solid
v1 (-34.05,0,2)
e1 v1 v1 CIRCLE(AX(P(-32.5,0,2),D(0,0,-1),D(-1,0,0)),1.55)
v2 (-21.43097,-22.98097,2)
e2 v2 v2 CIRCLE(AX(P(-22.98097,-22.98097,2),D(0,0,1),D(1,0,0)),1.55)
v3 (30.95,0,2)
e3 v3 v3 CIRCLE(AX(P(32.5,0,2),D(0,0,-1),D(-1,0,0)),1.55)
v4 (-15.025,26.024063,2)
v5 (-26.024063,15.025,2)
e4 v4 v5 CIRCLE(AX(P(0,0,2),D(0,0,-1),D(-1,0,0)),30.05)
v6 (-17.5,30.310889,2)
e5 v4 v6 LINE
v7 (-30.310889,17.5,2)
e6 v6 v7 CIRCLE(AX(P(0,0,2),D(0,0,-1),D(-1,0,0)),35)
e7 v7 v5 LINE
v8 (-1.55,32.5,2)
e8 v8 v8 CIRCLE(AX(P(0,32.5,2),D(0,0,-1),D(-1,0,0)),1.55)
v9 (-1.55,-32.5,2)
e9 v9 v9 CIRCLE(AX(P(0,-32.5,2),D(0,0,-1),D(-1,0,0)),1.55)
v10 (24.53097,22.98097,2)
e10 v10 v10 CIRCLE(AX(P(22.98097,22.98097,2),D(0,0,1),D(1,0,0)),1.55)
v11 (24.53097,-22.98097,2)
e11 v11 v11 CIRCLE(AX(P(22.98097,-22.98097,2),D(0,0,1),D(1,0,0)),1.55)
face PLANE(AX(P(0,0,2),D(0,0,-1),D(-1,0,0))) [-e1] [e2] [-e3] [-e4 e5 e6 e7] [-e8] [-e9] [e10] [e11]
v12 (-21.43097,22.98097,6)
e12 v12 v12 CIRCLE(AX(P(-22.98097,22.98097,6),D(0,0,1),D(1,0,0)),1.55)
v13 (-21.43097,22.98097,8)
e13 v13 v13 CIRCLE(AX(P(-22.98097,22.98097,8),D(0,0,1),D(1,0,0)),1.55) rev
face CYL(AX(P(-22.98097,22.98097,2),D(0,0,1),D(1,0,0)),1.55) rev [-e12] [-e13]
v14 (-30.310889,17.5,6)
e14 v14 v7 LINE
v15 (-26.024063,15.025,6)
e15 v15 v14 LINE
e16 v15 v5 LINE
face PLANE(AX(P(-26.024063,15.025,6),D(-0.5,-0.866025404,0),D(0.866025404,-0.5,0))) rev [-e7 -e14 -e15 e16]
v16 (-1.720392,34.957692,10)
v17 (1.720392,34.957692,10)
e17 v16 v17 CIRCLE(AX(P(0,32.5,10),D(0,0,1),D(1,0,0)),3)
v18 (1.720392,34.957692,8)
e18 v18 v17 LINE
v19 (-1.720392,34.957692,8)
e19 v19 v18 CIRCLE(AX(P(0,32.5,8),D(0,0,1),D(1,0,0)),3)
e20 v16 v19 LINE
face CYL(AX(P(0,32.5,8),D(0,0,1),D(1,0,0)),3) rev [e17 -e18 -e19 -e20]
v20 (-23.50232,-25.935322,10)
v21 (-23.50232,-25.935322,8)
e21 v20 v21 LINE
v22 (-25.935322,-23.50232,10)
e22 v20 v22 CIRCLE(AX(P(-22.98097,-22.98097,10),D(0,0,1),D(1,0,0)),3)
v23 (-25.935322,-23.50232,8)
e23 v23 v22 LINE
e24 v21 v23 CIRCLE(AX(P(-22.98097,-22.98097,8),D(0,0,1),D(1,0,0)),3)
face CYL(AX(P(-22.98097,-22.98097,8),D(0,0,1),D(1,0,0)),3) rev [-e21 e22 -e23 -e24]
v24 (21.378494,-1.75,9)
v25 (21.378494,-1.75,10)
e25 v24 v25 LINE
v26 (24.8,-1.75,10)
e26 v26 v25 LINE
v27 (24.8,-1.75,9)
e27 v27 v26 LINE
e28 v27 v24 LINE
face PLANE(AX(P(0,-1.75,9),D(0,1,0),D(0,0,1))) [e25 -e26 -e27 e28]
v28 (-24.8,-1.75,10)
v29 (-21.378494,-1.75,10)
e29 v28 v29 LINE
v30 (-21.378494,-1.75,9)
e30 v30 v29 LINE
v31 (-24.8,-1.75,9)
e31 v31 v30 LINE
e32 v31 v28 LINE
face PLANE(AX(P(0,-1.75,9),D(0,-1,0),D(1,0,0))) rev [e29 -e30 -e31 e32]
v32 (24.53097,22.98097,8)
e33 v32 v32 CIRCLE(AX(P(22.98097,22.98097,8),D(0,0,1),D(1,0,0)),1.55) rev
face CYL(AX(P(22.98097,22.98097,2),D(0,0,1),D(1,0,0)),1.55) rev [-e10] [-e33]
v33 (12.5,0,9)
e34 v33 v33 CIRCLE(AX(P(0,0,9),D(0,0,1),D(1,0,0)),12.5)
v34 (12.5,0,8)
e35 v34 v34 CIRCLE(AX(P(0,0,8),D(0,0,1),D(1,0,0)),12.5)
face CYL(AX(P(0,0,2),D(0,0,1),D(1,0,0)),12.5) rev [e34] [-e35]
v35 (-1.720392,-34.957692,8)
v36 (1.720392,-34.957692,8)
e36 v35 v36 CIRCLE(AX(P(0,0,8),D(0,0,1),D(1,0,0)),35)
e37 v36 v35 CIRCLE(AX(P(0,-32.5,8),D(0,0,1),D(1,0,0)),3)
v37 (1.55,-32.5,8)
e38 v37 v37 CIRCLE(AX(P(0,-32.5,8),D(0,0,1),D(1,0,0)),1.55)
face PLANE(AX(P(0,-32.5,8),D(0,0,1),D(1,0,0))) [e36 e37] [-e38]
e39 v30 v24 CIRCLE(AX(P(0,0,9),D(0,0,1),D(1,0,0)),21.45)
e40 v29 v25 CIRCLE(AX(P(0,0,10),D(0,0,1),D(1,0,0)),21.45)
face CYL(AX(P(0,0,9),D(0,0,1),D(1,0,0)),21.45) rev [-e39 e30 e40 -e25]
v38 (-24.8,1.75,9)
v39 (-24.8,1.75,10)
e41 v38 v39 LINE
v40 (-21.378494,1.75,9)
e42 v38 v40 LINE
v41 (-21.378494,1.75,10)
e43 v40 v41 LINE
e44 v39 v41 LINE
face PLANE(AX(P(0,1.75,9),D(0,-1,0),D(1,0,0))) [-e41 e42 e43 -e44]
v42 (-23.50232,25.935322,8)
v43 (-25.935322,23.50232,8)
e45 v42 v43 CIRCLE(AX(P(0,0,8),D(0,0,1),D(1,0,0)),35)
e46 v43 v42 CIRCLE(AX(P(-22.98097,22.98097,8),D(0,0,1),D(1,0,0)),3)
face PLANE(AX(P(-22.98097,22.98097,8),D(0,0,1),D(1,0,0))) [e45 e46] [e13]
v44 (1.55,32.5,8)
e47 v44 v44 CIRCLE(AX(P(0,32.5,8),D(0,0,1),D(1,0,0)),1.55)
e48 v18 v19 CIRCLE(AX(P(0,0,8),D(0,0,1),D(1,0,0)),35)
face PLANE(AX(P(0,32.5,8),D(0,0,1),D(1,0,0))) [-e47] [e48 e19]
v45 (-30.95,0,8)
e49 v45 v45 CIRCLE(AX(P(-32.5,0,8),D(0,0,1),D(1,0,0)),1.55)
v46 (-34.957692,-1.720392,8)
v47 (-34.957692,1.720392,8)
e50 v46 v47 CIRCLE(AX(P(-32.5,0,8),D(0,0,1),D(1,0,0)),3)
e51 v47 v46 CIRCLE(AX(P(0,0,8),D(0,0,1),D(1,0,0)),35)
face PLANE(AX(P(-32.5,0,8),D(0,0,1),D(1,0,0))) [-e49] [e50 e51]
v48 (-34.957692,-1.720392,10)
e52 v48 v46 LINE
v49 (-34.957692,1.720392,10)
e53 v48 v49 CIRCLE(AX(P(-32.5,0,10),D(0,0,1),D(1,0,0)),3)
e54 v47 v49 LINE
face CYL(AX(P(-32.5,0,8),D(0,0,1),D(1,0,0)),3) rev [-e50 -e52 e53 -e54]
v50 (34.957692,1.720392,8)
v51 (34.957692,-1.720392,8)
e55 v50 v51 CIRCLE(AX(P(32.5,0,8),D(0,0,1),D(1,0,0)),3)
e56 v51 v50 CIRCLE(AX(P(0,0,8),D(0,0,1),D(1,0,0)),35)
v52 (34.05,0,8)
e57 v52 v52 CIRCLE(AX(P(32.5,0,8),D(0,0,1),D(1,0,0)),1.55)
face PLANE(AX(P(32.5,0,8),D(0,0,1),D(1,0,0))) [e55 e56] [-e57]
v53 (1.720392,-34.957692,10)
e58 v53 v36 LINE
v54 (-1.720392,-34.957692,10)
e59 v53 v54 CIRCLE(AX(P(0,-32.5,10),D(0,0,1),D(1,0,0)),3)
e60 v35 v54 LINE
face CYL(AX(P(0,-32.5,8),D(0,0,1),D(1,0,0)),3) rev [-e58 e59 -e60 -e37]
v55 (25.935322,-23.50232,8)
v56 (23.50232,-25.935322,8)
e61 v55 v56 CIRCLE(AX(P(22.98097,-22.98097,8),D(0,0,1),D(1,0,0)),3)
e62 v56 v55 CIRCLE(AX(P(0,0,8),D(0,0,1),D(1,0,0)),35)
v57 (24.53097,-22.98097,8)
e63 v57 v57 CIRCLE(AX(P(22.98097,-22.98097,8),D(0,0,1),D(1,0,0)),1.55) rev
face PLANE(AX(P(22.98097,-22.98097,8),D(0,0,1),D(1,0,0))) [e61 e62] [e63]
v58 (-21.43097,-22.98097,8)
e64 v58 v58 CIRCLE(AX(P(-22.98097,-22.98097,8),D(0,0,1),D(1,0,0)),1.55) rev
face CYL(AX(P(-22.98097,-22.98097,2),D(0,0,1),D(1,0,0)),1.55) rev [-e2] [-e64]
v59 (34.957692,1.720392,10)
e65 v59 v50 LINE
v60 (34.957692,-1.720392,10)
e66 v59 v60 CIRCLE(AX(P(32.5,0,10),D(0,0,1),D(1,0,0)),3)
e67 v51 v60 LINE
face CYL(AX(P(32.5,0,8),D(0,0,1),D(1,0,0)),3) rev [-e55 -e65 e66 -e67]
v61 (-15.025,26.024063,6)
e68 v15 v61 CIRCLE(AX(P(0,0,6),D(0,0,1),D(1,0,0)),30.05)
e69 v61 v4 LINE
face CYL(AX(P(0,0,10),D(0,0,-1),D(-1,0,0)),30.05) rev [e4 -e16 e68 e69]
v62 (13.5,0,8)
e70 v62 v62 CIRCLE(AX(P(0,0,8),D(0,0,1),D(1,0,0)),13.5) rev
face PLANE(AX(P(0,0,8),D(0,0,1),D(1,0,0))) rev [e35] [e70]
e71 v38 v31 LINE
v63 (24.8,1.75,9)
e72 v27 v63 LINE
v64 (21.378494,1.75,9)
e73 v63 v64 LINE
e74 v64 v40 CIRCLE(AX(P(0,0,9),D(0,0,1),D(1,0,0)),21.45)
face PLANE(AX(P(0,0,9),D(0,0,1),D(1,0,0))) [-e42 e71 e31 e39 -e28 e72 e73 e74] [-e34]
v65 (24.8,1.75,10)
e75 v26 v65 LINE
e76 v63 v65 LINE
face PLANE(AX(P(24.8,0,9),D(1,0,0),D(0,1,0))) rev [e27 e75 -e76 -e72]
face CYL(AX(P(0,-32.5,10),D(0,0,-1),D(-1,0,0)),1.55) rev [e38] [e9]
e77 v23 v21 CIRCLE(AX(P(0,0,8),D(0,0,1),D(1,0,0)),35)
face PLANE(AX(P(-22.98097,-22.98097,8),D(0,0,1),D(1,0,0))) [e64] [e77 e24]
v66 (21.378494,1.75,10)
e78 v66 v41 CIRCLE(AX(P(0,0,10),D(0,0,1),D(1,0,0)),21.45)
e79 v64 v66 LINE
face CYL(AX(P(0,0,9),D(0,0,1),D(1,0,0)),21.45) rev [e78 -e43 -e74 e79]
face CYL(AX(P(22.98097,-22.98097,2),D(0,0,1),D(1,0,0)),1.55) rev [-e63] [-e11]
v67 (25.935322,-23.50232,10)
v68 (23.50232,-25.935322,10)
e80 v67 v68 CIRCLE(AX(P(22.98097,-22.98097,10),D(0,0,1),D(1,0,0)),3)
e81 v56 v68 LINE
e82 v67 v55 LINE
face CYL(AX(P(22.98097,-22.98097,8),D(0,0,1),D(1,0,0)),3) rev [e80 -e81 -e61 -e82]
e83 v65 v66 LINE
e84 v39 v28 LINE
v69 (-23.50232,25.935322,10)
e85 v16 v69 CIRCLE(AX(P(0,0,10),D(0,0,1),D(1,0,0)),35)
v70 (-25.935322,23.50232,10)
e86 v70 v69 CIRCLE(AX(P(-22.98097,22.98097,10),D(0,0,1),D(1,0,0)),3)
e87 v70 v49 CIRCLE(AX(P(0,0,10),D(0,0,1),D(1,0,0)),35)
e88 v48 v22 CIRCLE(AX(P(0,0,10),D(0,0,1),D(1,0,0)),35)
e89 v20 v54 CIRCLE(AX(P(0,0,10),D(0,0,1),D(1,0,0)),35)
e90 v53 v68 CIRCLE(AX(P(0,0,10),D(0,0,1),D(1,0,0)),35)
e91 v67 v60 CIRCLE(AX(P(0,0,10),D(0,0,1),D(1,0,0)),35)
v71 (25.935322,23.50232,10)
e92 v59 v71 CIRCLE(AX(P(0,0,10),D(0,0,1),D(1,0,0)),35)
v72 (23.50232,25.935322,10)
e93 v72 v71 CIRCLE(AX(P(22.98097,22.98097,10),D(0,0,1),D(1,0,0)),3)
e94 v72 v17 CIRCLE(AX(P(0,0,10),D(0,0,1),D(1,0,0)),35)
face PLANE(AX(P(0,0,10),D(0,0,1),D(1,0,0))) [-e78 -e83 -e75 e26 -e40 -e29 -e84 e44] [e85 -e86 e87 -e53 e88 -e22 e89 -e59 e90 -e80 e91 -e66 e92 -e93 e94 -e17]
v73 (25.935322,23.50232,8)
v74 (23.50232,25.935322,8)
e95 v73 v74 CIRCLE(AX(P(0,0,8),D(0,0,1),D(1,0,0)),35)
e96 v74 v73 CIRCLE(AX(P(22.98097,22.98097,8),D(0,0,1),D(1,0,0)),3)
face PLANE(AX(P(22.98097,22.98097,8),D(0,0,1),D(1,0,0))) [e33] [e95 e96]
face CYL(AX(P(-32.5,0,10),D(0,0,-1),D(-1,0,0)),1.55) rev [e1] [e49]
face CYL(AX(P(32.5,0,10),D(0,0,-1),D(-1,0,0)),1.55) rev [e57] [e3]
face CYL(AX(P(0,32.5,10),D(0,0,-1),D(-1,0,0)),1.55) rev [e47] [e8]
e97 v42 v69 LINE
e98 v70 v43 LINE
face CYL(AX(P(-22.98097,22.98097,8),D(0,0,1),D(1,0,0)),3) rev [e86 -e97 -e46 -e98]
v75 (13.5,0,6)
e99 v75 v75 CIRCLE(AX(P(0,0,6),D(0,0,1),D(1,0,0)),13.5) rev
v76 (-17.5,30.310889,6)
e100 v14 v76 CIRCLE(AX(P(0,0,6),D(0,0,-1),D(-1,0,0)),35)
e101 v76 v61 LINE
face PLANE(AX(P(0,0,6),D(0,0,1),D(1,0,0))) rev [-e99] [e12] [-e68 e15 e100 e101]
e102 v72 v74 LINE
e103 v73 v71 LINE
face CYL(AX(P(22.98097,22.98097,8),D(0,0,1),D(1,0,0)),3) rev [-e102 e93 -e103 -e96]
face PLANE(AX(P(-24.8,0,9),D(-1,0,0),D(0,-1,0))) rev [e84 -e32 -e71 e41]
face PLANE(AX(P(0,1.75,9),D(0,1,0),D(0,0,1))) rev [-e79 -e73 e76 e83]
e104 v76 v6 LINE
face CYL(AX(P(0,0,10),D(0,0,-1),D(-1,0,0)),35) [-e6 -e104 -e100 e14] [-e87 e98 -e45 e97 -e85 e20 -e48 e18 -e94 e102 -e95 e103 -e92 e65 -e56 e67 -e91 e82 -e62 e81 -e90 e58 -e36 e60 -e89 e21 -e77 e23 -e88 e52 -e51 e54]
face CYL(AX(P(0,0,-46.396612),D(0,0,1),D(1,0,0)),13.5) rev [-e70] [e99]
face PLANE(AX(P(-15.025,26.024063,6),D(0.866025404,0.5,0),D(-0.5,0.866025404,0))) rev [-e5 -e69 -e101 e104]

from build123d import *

# Parameters (mm, degrees)
EXTRUDE_1_OUTLINE_R   = 35
EXTRUDE_1_OUTLINE_R_2 = 1.55
EXTRUDE_1_OUTLINE_R_3 = 30.05
EXTRUDE_1_DEPTH       = 10
SKETCH_2_R            = 33.525
SKETCH_2_R_2          = 18.525
EXTRUDE_1_2_DEPTH     = 4
SKETCH_3_R            = 1.55
CUT_EXTRUDE_1_DEPTH   = 51.497524692
CUT_EXTRUDE_2_DEPTH   = 6
SKETCH_8_R            = 35
SKETCH_8_R_2          = 30.05
CUT_EXTRUDE_3_DEPTH   = 2
SKETCH_9_R            = 3
CUT_EXTRUDE_4_DEPTH   = 2
SKETCH_10_R           = 1.55
CUT_EXTRUDE_5_DEPTH   = 51.139804547
SKETCH_11_R           = 3
CUT_EXTRUDE_6_DEPTH   = 2
SKETCH_14_R           = 18.525
SKETCH_14_R_2         = 13.5
EXTRUDE_2_DEPTH       = 4
SKETCH_15_R           = 17.5
CUT_EXTRUDE_8_DEPTH   = 1
SKETCH_17_R           = 17.5
SKETCH_17_R_2         = 12.5
CUT_EXTRUDE_9_DEPTH   = 1
SKETCH1_R             = 13.5
SKETCH1_R_2           = 12
BOSS_EXTRUDE1_DEPTH   = 1
SKETCH2_R             = 12.5
SKETCH2_R_2           = 12
CUT_EXTRUDE1_DEPTH    = 50.989999


# Read off the part's stored shape, not the designer's step: 凸台-拉伸1
with BuildPart() as part:
    # Extrude 1 outline → Extrude 1 (new body)
    with BuildSketch(Plane.XY):
        Circle(EXTRUDE_1_OUTLINE_R)
        with Locations((0, -32.5)):
            Circle(EXTRUDE_1_OUTLINE_R_2, mode=Mode.SUBTRACT)
        with Locations((-32.5, 0)):
            Circle(EXTRUDE_1_OUTLINE_R_2, mode=Mode.SUBTRACT)
        Circle(EXTRUDE_1_OUTLINE_R_3, mode=Mode.SUBTRACT)
        with Locations((32.5, 0)):
            Circle(EXTRUDE_1_OUTLINE_R_2, mode=Mode.SUBTRACT)
        with Locations((0, 32.5)):
            Circle(EXTRUDE_1_OUTLINE_R_2, mode=Mode.SUBTRACT)
    extrude(amount=EXTRUDE_1_DEPTH)

    # 草图2 → Extrude 1 2 (add)
    with BuildSketch(Plane.XY.offset(10)):
        Circle(SKETCH_2_R)
        Circle(SKETCH_2_R_2, mode=Mode.SUBTRACT)
    extrude(amount=-EXTRUDE_1_2_DEPTH)

    # 草图3 → 切除-拉伸1 (cut, through all)
    with BuildSketch(Plane(origin=(0, 0, 0), x_dir=(-1, 0, 0), z_dir=(0, 0, -1))):
        with Locations(Location((32.5, 0, 0), (0, 0, 180))):
            Circle(SKETCH_3_R)
        with Locations(Location((0, -32.5, 0), (0, 0, 180))):
            Circle(SKETCH_3_R)
        with Locations(Location((-32.5, 0, 0), (0, 0, 180))):
            Circle(SKETCH_3_R)
        with Locations(Location((0, 32.5, 0), (0, 0, 180))):
            Circle(SKETCH_3_R)
    extrude(amount=-CUT_EXTRUDE_1_DEPTH, mode=Mode.SUBTRACT)

    # 草图7 → 切除-拉伸2 (cut)
    with BuildSketch(Plane(origin=(0, 0, 0), x_dir=(-1, 0, 0), z_dir=(0, 0, -1))):
        with BuildLine():
            Line((15.025, 26.024063384), (17.5, 30.310889132))
            ThreePointArc((17.5, 30.310889132), (24.748737342, 24.748737342), (30.310889132, 17.5))
            Line((30.310889132, 17.5), (26.024063384, 15.025))
            ThreePointArc((26.024063384, 15.025), (21.248558775, 21.248558775), (15.025, 26.024063384))
        make_face()
    extrude(amount=-CUT_EXTRUDE_2_DEPTH, mode=Mode.SUBTRACT)

    # 草图8 → 切除-拉伸3 (cut)
    with BuildSketch(Plane(origin=(0, 0, 0), x_dir=(-1, 0, 0), z_dir=(0, 0, -1))):
        with Locations(Location((0, 0, 0), (0, 0, 30))):
            Circle(SKETCH_8_R)
        Circle(SKETCH_8_R_2, mode=Mode.SUBTRACT)
    extrude(amount=-CUT_EXTRUDE_3_DEPTH, mode=Mode.SUBTRACT)

    # 草图9 → 切除-拉伸4 (cut)
    with BuildSketch(Plane.XY.offset(10)):
        with Locations((0, 32.5)):
            Circle(SKETCH_9_R)
        with Locations((32.5, 0)):
            Circle(SKETCH_9_R)
        with Locations((0, -32.5)):
            Circle(SKETCH_9_R)
        with Locations((-32.5, 0)):
            Circle(SKETCH_9_R)
    extrude(amount=-CUT_EXTRUDE_4_DEPTH, mode=Mode.SUBTRACT)

    # 草图10 → 切除-拉伸5 (cut, through all)
    with BuildSketch(Plane.XY.offset(10)):
        with Locations((22.980970389, 22.980970389)):
            Circle(SKETCH_10_R)
        with Locations((22.980970389, -22.980970389)):
            Circle(SKETCH_10_R)
        with Locations((-22.980970389, -22.980970389)):
            Circle(SKETCH_10_R)
        with Locations((-22.980970389, 22.980970389)):
            Circle(SKETCH_10_R)
    extrude(amount=-CUT_EXTRUDE_5_DEPTH, mode=Mode.SUBTRACT)

    # 草图11 → 切除-拉伸6 (cut)
    with BuildSketch(Plane.XY.offset(10)):
        with Locations((22.980970389, 22.980970389)):
            Circle(SKETCH_11_R)
        with Locations((22.980970389, -22.980970389)):
            Circle(SKETCH_11_R)
        with Locations((-22.980970389, -22.980970389)):
            Circle(SKETCH_11_R)
        with Locations((-22.980970389, 22.980970389)):
            Circle(SKETCH_11_R)
    extrude(amount=-CUT_EXTRUDE_6_DEPTH, mode=Mode.SUBTRACT)

    # 草图14 → 凸台-拉伸2 (add)
    with BuildSketch(Plane.XY.offset(10)):
        Circle(SKETCH_14_R)
        Circle(SKETCH_14_R_2, mode=Mode.SUBTRACT)
    extrude(amount=-EXTRUDE_2_DEPTH)

    # 草图15 → 切除-拉伸8 (cut)
    with BuildSketch(Plane.XY.offset(10)):
        with BuildLine():
            ThreePointArc((21.378493867, 1.75), (0, 21.45), (-21.378493867, 1.75))
            Line((-21.378493866, 1.75), (-24.8, 1.75))
            Line((-24.8, 1.75), (-24.8, -1.75))
            Line((-24.8, -1.75), (-21.378493867, -1.75))
            ThreePointArc((-21.378493867, -1.75), (0, -21.45), (21.378493867, -1.75))
            Line((21.378493867, -1.75), (24.8, -1.75))
            Line((24.8, -1.75), (24.8, 1.75))
            Line((24.8, 1.75), (21.378493867, 1.75))
        make_face()
        Circle(SKETCH_15_R, mode=Mode.SUBTRACT)
    extrude(amount=-CUT_EXTRUDE_8_DEPTH, mode=Mode.SUBTRACT)

    # 草图17 → 切除-拉伸9 (cut)
    with BuildSketch(Plane.XY.offset(10)):
        Circle(SKETCH_17_R)
        Circle(SKETCH_17_R_2, mode=Mode.SUBTRACT)
    extrude(amount=-CUT_EXTRUDE_9_DEPTH, mode=Mode.SUBTRACT)

    # Sketch1 → Boss-Extrude1 (add)
    with BuildSketch(Plane.XY.offset(9)):
        Circle(SKETCH1_R)
        Circle(SKETCH1_R_2, mode=Mode.SUBTRACT)
    extrude(amount=-BOSS_EXTRUDE1_DEPTH)

    # Sketch2 → Cut-Extrude1 (cut, through all)
    with BuildSketch(Plane.XY.offset(9)):
        Circle(SKETCH2_R)
        Circle(SKETCH2_R_2, mode=Mode.SUBTRACT)
    extrude(amount=-CUT_EXTRUDE1_DEPTH, mode=Mode.SUBTRACT)


solid = part.part
